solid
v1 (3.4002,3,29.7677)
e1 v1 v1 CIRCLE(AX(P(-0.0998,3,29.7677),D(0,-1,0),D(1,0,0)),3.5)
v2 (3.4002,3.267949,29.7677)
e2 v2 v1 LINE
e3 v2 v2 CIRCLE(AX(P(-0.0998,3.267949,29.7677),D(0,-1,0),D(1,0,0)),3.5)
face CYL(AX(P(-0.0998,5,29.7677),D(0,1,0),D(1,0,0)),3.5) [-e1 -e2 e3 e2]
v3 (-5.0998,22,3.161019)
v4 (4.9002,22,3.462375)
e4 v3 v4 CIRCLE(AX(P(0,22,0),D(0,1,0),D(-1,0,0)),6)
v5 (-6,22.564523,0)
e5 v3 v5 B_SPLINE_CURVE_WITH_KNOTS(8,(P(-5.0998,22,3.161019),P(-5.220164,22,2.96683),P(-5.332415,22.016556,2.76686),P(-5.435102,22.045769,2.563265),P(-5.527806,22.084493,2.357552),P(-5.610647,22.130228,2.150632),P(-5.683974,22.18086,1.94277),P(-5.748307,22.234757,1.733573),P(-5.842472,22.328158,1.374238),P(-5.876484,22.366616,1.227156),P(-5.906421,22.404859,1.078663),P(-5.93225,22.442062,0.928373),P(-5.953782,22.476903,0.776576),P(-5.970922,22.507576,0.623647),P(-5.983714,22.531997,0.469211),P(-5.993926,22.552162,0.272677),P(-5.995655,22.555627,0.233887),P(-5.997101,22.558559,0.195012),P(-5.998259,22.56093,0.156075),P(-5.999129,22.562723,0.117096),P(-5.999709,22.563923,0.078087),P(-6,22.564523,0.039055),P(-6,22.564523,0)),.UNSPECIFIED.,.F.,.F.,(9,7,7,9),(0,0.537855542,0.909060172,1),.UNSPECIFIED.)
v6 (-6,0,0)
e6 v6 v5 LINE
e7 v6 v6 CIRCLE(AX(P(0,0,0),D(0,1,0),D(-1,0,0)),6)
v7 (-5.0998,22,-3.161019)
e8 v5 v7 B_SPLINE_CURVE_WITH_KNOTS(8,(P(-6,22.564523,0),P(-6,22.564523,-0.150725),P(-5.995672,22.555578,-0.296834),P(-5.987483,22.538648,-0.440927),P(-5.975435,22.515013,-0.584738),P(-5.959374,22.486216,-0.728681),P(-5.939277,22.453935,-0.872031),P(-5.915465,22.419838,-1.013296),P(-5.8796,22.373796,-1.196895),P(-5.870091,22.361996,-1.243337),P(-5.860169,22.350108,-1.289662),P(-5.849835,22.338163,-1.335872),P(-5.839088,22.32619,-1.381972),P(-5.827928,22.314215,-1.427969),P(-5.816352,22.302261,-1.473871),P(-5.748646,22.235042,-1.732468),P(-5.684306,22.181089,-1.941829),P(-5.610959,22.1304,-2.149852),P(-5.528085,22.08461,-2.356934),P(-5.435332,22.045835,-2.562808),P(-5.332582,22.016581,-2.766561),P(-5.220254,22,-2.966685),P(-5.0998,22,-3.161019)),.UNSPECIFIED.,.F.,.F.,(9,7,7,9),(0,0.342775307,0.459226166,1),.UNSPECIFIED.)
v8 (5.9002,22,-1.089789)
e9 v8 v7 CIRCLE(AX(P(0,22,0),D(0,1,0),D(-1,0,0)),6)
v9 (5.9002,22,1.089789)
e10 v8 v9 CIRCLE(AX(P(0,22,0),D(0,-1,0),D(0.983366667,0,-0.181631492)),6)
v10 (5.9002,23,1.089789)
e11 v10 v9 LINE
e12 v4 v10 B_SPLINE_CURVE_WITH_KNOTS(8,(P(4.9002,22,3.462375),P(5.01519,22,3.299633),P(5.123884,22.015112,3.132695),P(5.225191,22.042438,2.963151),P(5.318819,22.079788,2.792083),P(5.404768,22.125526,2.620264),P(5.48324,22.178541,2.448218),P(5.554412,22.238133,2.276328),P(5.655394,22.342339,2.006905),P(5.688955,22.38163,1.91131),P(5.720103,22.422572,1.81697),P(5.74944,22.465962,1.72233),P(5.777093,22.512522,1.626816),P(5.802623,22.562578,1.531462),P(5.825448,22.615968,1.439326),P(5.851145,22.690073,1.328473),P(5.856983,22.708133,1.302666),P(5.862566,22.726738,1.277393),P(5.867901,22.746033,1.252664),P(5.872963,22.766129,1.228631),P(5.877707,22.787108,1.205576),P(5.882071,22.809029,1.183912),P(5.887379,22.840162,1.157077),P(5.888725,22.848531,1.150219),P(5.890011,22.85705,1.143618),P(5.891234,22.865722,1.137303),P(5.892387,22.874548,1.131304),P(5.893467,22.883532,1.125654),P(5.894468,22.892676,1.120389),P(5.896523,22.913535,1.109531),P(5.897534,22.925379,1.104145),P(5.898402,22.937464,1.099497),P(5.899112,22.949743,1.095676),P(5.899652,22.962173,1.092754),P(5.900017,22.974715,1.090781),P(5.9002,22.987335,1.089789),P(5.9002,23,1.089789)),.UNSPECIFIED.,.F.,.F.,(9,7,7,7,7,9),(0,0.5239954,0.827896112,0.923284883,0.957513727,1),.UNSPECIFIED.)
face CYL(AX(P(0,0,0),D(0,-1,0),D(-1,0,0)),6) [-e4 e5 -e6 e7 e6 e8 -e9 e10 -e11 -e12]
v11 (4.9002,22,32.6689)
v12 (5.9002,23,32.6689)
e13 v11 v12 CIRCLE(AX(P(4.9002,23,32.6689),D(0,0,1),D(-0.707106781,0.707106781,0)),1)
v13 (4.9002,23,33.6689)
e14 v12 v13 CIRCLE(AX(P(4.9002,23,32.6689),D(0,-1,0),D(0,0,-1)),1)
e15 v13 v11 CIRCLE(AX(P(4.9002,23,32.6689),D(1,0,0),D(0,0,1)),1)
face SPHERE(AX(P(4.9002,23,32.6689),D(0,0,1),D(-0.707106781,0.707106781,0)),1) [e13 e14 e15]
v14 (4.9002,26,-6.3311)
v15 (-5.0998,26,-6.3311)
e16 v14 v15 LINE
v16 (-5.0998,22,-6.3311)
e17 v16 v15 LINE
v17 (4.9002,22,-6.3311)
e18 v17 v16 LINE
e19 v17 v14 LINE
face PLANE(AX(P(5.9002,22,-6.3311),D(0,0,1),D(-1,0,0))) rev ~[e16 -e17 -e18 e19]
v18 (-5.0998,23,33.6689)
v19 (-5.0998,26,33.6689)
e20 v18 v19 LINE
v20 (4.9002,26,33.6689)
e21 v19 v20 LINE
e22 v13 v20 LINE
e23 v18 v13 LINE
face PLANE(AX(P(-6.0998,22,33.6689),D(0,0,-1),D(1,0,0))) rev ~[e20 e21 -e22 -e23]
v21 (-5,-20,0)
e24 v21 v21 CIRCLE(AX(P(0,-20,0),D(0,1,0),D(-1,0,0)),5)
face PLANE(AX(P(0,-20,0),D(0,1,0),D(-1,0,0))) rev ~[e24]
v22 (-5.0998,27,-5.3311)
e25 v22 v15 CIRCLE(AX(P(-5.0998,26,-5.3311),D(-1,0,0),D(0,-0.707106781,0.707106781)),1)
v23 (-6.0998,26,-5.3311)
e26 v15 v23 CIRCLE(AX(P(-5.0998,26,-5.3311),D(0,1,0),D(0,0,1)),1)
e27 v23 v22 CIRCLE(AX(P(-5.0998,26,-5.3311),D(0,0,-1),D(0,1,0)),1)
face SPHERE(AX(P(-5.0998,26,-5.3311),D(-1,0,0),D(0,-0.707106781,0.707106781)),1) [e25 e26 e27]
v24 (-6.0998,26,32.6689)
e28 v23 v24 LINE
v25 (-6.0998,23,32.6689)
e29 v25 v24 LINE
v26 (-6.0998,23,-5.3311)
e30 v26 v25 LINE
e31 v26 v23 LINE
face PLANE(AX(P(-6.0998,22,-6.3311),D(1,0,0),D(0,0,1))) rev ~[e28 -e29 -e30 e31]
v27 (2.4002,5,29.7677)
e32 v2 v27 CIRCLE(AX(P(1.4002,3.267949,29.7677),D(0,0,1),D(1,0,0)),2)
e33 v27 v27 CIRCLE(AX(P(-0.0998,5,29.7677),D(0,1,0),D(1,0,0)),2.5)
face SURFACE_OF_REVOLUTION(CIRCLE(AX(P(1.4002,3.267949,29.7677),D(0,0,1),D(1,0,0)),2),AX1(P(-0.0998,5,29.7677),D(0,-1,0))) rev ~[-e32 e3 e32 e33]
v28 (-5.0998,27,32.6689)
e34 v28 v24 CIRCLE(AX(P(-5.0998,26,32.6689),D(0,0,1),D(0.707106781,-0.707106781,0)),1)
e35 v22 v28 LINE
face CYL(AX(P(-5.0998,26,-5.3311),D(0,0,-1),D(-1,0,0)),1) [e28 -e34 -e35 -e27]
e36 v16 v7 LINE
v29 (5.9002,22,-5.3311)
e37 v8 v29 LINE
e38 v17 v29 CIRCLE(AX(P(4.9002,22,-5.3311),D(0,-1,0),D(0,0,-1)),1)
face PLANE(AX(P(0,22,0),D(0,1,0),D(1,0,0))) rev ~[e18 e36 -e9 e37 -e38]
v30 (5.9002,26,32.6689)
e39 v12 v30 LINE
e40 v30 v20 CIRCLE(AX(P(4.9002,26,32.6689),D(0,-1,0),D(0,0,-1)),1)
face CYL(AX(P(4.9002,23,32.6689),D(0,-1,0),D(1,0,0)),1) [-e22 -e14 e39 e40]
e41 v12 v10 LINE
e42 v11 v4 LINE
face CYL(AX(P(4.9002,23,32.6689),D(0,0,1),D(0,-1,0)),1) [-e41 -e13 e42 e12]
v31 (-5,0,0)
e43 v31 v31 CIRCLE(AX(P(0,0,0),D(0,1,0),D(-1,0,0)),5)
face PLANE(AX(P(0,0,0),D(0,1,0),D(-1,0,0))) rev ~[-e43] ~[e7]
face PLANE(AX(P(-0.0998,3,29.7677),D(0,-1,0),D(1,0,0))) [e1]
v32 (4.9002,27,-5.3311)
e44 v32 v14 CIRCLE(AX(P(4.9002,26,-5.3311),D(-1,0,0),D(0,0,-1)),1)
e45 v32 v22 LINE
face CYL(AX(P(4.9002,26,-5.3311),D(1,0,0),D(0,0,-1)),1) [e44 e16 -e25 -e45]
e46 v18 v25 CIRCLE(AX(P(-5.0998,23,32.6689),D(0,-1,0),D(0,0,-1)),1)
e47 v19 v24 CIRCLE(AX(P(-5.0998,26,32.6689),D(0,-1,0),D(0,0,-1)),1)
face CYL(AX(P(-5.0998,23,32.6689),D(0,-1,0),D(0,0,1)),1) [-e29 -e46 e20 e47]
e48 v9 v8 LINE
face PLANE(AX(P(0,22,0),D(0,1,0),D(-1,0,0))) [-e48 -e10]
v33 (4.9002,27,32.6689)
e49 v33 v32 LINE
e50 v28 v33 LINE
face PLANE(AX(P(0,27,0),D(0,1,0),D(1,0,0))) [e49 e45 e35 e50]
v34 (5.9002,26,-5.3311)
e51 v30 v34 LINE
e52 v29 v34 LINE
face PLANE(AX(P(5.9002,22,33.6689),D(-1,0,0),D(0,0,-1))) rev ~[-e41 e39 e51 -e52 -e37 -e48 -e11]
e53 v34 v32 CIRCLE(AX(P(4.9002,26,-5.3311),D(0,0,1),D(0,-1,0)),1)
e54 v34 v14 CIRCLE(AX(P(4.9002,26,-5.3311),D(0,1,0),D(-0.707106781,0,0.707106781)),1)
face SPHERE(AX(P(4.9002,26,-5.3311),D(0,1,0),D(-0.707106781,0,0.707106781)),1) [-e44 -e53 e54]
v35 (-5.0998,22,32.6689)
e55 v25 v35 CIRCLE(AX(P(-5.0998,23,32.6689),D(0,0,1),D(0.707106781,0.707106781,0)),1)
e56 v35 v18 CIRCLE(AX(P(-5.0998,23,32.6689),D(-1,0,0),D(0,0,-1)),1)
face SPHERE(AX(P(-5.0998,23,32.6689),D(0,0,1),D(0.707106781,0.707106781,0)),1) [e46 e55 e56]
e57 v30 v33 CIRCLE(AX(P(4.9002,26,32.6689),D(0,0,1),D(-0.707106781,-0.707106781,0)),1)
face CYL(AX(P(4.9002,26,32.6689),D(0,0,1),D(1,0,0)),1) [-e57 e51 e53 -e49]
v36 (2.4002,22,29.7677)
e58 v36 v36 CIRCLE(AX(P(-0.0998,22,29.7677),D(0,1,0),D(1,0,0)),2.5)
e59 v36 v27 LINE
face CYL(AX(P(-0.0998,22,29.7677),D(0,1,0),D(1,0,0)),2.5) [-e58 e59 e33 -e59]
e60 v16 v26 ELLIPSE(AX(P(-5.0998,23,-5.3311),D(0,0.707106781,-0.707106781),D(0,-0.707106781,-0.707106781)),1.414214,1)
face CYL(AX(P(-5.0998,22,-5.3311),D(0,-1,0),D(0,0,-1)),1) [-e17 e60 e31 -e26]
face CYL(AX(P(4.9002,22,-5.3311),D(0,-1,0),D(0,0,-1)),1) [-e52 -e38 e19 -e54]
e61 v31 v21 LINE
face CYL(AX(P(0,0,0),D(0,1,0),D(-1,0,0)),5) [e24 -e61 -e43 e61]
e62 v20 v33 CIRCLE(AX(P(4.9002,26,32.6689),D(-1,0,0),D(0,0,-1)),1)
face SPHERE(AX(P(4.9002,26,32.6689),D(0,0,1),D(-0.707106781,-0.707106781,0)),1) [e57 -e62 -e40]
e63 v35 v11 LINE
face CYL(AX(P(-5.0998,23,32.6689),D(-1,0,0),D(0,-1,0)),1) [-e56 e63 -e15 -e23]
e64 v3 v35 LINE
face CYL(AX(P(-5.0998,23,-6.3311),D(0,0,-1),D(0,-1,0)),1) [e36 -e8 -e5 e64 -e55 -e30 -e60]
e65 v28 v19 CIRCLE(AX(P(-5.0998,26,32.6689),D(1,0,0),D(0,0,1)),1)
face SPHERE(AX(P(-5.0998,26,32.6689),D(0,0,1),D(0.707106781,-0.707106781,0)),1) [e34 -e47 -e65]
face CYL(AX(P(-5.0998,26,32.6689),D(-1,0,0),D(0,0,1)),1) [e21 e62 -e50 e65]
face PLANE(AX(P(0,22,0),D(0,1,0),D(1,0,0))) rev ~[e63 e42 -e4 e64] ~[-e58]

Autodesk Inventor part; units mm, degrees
ref_plane "YZ Plane" through (0, 0, 0) normal (1, 0, 0) x (0, 1, 0)
ref_plane "XZ Plane" through (0, 0, 0) normal (0, 1, 0) x (-1, 0, 0)
ref_plane "XY Plane" through (0, 0, 0) normal (0, 0, 1) x (1, 0, 0)
sketch "Sketch1" plane through (0, 0, 0) normal (0, 1, 0) x (-1, 0, 0)
  circle A0 centre (0, 0) radius 5
  circle A1 centre (0, 0) radius 6
  dimension "d0" = 10
  dimension "d1" = 12
extrude "Extrusion1" add sketch "Sketch1" against normal blind 20 contours A0
extrude "Extrusion2" add sketch "Sketch1" along normal blind 22 contours A0 | A1
sketch "Sketch2" plane through (0, 22, 0) normal (0, 1, 0) x (1, 0, 0)
  line L0 (-6.0998, -33.6689) -> (5.9002, -33.6689)
  line L1 (5.9002, -33.6689) -> (5.9002, 6.3311)
  line L2 (5.9002, 6.3311) -> (-6.0998, 6.3311)
  line L3 (-6.0998, 6.3311) -> (-6.0998, -33.6689)
  circle A0 centre (-0.0998, -29.7677) radius 2.5
  point P0 (0, 0)
  dimension "d8" = 12
  dimension "d9" = 40
  dimension "d15" = 5
extrude "Extrusion3" add sketch "Sketch2" along normal blind 5 contours L3 L2 L1 L0 | A0
fillet "Fillet1" radius 1 11 edges at (5.9002, 27, 13.6689) (5.9002, 22, 17.3793) (5.9002, 24.5, -6.3311) (-0.0998, 27, -6.3311) (-6.0998, 27, 13.6689) (-0.0998, 27, 33.6689) (-6.0998, 24.5, 33.6689) (-6.0998, 22, 13.6689) (-6.0998, 24.5, -6.3311) (-0.0998, 22, 33.6689) (5.9002, 24.5, 33.6689)
thread "Thread1" size "M10x1.5" class "6g" standard "ANSI Metric M Profile" full length
extrude "Extrusion4" add sketch "Sketch2" against normal blind 17 contours A0
sketch "Sketch3" plane through (-0.0998, 5, 29.7677) normal (0, -1, 0) x (1, 0, 0)
  circle A0 centre (0, 0) radius 3.5
  point P0 (0.0998, -29.7677)
  dimension "d18" = 7
extrude "Extrusion5" add sketch "Sketch3" along normal blind 2
fillet "Fillet2" radius 2 1 edges at (-3.5998, 5, 29.7677)
sketch "Sketch4" plane through (-0.0998, 3, 29.7677) normal (0, -1, 0) x (1, 0, 0)
  point P0 (0.0998, -29.7677)
properties part number "clamp" material "Steel, Carbon"
